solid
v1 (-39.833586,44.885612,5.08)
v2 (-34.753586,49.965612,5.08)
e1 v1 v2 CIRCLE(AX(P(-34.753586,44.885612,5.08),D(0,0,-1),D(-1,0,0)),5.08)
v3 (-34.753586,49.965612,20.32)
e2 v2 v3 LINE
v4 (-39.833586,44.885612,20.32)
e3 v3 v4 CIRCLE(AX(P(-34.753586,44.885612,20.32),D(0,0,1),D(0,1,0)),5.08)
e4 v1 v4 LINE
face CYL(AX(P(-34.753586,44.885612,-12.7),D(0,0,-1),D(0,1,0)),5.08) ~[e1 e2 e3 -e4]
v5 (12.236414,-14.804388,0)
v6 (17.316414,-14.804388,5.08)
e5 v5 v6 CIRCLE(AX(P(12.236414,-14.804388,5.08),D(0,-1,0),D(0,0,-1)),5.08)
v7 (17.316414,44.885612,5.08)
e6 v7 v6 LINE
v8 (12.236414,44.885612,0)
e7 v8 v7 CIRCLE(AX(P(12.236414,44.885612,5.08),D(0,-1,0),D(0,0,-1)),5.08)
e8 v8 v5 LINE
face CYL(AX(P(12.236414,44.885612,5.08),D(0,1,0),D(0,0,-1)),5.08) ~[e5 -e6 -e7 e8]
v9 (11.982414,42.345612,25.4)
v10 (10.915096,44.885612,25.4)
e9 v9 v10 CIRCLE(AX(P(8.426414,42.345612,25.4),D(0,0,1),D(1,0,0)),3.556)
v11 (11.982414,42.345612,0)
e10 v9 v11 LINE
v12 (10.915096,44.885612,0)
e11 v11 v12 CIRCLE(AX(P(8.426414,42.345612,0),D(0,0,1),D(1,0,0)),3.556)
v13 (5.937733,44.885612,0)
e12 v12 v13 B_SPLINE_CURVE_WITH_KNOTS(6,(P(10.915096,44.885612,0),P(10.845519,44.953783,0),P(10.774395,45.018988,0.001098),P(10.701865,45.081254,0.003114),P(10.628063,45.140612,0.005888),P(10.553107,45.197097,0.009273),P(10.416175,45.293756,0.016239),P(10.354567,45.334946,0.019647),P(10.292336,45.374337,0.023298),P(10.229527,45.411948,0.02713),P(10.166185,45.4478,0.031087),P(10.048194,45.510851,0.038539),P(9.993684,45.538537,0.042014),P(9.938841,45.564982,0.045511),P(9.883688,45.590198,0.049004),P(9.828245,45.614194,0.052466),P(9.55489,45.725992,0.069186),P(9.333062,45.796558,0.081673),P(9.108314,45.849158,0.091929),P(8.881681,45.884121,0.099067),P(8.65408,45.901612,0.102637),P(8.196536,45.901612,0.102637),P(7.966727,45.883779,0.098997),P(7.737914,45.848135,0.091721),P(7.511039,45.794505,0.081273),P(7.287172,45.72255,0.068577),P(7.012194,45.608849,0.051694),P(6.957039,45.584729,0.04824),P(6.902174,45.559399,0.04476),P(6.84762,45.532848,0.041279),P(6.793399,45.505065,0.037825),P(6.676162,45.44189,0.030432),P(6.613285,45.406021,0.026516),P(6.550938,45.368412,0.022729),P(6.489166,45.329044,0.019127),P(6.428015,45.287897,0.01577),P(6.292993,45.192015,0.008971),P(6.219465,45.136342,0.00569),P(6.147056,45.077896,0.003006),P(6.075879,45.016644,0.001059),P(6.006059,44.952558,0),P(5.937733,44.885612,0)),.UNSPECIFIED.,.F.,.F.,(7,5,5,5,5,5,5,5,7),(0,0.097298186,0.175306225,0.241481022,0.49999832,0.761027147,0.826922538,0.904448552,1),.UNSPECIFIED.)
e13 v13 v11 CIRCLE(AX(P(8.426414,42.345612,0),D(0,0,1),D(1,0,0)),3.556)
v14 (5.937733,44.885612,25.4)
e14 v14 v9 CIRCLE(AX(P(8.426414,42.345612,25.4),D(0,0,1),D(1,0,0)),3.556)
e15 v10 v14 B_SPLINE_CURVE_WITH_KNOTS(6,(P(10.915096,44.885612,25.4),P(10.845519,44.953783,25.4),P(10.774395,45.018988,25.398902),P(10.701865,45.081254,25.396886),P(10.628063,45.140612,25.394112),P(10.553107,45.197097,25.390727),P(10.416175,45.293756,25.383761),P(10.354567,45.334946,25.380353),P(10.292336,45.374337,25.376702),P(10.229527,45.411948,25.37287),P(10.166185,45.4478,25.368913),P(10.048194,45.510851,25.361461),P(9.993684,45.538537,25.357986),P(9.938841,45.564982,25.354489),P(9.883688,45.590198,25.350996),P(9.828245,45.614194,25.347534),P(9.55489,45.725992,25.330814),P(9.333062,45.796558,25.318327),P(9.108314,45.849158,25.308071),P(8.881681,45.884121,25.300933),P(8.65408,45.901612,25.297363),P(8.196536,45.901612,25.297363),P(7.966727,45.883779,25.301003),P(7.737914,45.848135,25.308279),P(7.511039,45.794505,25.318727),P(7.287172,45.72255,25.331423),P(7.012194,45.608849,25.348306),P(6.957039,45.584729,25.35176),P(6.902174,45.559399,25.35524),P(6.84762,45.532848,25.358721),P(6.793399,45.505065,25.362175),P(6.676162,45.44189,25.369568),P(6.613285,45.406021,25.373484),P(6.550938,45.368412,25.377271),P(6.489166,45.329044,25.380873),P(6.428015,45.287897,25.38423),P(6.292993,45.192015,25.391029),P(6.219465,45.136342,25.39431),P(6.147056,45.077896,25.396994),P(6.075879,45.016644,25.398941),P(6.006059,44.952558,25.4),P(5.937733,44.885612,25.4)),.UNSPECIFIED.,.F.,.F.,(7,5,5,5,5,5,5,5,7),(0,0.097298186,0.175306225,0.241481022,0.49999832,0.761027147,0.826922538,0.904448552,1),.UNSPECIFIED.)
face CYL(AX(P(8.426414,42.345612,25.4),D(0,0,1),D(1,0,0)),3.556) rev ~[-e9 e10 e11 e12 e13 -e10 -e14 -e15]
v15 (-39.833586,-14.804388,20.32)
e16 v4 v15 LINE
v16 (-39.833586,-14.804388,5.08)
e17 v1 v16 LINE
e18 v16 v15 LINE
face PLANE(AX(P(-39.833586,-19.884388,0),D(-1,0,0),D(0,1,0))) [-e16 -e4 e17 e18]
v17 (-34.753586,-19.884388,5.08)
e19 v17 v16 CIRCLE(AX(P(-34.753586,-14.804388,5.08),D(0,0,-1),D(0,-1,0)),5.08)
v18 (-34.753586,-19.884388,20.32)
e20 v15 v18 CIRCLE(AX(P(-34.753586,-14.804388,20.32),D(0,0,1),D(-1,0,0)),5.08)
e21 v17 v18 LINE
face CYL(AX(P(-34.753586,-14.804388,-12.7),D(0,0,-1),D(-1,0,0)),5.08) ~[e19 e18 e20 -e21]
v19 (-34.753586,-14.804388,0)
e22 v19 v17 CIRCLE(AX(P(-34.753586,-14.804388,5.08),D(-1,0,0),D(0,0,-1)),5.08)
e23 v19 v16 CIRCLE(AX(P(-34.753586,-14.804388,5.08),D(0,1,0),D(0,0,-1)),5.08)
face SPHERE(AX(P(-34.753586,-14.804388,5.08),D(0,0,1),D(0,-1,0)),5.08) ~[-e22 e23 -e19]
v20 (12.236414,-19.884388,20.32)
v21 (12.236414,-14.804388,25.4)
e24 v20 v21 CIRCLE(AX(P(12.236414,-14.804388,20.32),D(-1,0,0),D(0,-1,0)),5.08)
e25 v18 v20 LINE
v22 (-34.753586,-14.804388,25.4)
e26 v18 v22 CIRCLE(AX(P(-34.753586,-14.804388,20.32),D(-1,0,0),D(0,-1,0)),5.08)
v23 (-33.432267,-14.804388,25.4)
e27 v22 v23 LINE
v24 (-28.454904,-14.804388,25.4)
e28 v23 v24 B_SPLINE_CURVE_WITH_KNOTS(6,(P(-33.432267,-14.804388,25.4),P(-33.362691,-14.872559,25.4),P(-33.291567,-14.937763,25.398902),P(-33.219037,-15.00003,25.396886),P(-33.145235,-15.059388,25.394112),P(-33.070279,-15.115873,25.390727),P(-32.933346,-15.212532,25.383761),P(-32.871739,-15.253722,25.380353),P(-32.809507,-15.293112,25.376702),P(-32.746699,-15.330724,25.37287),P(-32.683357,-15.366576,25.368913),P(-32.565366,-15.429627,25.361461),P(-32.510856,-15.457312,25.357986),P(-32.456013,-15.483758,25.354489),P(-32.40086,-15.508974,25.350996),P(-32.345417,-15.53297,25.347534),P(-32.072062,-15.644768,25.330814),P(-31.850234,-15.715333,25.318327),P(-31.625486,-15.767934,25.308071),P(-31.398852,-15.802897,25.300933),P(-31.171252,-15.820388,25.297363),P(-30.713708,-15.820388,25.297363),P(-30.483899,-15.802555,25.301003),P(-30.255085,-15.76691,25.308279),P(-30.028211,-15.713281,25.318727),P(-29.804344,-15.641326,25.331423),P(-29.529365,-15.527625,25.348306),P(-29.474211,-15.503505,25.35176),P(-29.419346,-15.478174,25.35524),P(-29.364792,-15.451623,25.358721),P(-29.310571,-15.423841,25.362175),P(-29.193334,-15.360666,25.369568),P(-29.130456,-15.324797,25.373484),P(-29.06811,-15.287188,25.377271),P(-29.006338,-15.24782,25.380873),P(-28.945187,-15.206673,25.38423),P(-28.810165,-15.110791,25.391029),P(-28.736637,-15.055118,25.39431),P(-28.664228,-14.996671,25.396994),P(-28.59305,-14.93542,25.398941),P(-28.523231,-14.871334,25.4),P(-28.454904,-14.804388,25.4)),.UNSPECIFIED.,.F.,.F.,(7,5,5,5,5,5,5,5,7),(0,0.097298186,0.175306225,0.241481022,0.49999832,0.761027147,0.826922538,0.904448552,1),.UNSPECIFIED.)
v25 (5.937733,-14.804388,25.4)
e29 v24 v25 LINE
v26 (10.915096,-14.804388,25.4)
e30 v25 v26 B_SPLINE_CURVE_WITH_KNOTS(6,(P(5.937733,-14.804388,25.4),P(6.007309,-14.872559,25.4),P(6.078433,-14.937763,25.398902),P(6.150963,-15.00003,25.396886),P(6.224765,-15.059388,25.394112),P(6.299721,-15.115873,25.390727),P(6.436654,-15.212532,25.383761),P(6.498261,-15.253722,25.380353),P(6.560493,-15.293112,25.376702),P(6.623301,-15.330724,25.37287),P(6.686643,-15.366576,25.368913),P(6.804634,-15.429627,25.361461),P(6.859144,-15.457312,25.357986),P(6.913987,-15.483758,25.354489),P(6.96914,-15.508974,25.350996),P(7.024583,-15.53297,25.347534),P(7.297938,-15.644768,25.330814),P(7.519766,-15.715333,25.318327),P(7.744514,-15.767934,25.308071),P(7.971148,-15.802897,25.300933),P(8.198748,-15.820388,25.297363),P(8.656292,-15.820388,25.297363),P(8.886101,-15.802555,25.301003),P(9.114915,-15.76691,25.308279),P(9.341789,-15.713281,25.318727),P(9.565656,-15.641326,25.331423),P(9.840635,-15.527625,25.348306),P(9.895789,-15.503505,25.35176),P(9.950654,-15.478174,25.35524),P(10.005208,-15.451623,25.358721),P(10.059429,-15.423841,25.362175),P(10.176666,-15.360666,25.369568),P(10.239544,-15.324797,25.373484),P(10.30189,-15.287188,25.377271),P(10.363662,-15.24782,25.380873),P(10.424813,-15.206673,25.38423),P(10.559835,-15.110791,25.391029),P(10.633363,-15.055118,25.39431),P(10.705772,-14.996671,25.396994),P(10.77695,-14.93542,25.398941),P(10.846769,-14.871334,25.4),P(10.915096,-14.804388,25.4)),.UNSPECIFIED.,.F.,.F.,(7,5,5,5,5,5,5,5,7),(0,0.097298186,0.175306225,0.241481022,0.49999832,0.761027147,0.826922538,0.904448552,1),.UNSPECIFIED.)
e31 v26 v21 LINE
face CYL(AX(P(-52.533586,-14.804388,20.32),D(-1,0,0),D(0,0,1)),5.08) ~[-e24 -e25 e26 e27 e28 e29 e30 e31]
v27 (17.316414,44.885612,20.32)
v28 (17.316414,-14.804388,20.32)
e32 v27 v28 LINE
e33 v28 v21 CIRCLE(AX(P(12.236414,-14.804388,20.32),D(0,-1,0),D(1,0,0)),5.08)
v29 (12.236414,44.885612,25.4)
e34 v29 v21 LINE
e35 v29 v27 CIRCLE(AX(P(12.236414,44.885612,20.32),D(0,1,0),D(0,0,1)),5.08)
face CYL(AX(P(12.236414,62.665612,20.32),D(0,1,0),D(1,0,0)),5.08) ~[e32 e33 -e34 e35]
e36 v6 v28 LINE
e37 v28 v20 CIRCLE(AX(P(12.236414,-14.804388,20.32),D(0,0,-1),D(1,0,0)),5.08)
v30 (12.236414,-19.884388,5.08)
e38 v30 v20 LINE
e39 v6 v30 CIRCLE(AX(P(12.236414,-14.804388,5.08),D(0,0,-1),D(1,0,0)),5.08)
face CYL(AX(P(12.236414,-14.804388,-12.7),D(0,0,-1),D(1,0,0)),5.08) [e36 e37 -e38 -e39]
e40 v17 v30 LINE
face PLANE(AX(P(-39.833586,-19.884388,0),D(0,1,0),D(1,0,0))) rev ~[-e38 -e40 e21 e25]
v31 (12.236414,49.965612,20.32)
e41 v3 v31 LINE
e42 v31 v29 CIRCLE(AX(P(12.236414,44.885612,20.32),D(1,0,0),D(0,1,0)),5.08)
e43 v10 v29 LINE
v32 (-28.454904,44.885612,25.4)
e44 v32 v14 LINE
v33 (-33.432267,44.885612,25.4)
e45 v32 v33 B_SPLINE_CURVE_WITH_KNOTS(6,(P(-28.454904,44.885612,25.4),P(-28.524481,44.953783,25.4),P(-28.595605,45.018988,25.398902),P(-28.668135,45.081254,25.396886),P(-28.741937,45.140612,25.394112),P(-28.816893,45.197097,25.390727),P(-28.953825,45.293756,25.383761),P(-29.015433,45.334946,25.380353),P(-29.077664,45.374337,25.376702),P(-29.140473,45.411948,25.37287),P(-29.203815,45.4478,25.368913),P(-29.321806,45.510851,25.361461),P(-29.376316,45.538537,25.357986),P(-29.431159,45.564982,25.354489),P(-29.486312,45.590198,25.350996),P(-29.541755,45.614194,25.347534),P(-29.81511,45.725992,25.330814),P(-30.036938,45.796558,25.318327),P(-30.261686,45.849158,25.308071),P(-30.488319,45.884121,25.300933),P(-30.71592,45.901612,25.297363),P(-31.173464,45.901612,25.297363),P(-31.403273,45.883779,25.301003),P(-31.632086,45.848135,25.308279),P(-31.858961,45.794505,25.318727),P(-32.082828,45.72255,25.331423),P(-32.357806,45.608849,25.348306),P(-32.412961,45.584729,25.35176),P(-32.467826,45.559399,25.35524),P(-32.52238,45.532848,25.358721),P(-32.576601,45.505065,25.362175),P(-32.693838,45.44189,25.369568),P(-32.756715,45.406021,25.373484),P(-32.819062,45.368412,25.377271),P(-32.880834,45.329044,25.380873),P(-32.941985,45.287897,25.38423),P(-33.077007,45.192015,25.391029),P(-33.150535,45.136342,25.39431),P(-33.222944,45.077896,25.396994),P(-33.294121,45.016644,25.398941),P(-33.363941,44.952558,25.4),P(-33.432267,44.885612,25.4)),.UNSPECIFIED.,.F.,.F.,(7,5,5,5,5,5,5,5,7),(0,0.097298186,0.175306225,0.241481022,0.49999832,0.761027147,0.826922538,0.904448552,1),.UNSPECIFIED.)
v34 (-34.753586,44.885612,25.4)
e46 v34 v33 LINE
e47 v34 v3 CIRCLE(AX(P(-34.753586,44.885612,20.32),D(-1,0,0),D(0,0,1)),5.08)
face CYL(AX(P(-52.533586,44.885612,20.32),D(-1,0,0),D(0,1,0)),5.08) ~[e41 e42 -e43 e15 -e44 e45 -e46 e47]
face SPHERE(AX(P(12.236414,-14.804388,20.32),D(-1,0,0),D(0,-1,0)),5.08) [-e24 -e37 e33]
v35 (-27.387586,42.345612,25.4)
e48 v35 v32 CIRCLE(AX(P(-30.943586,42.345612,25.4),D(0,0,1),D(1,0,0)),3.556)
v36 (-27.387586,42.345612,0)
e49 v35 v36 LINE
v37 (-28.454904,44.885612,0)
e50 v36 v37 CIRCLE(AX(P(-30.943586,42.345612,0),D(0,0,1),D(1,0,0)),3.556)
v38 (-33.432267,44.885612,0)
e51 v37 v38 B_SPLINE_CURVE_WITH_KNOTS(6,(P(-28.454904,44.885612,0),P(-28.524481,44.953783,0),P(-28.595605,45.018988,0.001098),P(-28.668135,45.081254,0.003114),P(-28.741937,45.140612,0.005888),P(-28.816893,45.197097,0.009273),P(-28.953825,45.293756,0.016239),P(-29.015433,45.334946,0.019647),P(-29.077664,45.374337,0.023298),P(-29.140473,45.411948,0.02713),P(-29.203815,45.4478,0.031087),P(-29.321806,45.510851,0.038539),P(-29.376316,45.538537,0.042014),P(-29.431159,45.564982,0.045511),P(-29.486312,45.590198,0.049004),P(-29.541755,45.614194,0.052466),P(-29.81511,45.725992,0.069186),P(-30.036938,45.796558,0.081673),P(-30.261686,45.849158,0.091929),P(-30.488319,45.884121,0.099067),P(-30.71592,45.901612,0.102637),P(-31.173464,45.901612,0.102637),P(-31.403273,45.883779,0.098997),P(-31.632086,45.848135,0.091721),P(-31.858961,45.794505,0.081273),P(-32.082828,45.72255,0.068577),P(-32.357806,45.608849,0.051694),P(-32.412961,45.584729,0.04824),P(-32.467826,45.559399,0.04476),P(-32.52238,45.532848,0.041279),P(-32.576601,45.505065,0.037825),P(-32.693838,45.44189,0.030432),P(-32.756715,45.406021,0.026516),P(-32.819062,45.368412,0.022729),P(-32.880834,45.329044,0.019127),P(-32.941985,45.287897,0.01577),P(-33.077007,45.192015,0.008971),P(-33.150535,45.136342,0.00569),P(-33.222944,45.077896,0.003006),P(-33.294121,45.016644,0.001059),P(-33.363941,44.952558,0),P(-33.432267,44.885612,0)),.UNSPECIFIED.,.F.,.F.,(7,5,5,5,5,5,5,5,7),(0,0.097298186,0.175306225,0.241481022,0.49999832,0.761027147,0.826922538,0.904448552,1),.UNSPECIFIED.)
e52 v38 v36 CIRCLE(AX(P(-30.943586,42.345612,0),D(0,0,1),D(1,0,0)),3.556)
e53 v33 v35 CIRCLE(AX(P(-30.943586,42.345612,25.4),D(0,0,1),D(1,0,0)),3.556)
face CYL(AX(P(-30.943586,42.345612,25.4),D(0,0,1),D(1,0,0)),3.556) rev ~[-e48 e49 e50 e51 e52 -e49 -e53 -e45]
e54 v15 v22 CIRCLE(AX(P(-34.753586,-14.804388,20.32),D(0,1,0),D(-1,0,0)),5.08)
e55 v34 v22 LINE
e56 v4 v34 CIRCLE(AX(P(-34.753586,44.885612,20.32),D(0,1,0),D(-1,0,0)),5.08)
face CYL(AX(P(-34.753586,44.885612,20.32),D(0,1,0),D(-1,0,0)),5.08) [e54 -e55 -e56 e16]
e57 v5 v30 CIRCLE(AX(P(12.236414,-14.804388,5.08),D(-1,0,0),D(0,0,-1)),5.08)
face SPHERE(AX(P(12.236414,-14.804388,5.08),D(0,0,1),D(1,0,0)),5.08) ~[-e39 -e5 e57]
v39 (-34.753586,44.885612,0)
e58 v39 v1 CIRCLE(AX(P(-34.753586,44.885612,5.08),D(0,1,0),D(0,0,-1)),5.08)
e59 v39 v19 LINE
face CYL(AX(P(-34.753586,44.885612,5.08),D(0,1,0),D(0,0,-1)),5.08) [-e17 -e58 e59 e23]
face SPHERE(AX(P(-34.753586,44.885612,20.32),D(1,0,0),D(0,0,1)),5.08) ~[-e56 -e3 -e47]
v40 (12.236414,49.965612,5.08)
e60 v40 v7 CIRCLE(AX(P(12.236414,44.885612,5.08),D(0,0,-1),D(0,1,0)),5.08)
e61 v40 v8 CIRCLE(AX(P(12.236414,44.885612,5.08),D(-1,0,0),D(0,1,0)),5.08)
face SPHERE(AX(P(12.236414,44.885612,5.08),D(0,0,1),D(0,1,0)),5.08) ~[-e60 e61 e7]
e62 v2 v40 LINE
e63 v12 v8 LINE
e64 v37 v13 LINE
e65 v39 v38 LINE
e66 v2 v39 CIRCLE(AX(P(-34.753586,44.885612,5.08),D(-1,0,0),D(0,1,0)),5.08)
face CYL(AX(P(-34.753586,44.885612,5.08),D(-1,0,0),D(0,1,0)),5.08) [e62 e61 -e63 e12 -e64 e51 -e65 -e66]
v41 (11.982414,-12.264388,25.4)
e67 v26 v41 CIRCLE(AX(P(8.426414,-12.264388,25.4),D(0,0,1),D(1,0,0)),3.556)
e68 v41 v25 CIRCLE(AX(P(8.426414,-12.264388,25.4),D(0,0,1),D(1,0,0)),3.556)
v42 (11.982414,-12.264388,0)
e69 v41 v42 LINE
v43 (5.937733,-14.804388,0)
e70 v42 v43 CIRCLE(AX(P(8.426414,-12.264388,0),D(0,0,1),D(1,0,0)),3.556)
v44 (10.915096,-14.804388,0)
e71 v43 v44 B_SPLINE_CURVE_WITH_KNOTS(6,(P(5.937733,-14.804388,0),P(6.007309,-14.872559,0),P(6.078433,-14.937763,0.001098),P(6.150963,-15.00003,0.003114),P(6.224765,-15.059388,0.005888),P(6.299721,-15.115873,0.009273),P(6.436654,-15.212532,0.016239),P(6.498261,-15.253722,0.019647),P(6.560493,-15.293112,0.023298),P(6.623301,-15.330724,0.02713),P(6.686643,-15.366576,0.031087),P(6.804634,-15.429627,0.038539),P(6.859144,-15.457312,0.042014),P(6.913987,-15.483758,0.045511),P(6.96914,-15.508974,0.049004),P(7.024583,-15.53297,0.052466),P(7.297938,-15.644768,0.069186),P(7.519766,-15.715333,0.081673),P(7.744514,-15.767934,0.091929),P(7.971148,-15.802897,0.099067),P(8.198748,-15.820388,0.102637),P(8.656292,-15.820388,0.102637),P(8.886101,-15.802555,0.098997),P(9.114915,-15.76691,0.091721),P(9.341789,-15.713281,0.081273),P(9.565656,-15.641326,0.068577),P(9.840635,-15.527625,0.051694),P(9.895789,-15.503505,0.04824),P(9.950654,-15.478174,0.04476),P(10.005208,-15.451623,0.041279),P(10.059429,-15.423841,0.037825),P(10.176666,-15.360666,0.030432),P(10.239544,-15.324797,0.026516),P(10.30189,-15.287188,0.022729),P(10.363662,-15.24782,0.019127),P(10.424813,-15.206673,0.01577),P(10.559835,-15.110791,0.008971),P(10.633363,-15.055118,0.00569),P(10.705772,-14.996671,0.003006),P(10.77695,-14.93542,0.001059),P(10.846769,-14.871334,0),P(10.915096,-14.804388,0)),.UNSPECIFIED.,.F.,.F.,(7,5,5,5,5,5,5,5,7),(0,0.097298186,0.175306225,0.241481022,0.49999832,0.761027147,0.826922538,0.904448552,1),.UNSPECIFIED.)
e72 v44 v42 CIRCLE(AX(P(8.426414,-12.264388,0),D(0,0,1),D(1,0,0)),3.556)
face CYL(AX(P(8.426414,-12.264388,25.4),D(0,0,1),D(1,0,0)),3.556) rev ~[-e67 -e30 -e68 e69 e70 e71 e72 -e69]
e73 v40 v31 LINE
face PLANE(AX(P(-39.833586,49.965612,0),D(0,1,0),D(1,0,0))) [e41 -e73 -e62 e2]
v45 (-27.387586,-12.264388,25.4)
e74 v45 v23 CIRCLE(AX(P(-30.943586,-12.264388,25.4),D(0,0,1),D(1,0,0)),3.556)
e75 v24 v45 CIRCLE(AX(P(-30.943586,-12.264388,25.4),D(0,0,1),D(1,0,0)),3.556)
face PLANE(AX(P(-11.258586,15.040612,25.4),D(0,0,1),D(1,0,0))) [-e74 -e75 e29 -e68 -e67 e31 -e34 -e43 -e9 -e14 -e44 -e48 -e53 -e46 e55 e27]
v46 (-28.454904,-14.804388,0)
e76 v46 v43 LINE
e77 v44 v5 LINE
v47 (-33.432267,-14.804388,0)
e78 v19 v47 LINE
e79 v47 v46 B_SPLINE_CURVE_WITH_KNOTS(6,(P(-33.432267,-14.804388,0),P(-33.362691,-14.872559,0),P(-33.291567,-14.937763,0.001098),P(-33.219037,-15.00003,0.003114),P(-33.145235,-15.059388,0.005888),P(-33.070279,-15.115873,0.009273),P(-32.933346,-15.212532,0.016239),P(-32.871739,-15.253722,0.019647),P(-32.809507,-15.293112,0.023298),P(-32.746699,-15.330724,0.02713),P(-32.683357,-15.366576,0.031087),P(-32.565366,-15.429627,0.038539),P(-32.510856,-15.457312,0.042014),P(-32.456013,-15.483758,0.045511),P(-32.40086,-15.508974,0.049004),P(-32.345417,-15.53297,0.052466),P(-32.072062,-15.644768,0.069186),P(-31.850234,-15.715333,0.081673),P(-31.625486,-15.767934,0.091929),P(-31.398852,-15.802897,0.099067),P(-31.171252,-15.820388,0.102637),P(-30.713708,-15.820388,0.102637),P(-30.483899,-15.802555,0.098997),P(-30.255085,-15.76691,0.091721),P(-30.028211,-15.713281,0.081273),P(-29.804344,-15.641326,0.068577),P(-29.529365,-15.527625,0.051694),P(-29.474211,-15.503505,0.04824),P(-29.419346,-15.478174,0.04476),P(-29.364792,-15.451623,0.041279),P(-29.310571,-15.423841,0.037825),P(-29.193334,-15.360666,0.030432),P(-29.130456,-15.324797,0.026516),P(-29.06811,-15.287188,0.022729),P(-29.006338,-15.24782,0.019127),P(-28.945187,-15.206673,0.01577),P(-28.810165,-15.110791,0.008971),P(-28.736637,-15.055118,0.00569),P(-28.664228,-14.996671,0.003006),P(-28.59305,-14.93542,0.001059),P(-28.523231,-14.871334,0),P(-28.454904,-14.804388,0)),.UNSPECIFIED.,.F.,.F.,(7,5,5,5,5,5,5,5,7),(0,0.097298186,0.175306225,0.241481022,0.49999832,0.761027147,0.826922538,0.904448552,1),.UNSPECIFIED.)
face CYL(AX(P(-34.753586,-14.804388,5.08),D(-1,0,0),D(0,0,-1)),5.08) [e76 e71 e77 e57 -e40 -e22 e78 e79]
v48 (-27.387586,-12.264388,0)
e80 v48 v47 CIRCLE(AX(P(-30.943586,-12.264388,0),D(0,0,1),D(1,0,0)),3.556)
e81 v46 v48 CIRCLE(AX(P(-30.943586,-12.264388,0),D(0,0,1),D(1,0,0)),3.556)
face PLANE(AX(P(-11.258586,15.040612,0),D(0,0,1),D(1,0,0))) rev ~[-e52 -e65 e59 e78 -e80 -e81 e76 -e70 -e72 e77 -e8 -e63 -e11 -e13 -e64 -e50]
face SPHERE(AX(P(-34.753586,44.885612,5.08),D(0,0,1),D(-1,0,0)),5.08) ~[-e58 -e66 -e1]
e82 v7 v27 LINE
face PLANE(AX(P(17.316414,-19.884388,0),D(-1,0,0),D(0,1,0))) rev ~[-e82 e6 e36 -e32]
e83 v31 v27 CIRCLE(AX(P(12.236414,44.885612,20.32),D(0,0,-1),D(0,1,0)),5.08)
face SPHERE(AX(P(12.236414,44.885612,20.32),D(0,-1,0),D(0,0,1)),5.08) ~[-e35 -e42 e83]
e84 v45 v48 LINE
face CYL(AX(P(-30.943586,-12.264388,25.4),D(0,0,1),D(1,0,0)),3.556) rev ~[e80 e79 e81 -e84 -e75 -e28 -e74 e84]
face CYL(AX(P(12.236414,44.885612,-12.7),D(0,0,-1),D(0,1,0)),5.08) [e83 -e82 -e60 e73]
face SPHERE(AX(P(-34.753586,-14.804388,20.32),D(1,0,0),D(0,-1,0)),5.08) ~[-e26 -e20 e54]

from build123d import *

# Parameters (mm, degrees)
F0_W         = 57.15
F0_H         = 69.85
F1_DEPTH     = 25.4
F2_R         = 3.556
F3_DEPTH     = 25.4
F4_T1_DEPTH  = 82.55
F5_T1_DEPTH  = 77.47
F5_T3_DEPTH  = 33.02
F5_T6_ANGLE  = 89.9999999979
F6_T1_DEPTH  = 64.77
F6_T3_DEPTH  = 33.02
F6_T6_ANGLE  = 89.9999999979
F7_T1_DEPTH  = 59.69
F7_T3_DEPTH  = 33.02
F7_T6_ANGLE  = 89.9999999979
F7_T8_ANGLE  = 89.9999999979
F8_T1_DEPTH  = 59.69
F8_T3_DEPTH  = 46.99
F8_T6_ANGLE  = 89.9999999979
F8_T8_ANGLE  = 90.0000000017
F8_T10_ANGLE = 90.0000000017
F8_T12_ANGLE = 89.9999999979


# Not quite as in the source:
# - a fillet or chamfer that OpenCascade refuses, or shapes differently, is made with other operations: its cross-section is extruded or revolved along the edge and cut away or added


with BuildPart() as f1:
    # F0 (on Top) → F1 (new body)
    with BuildSketch(Plane.XY):
        with Locations((-11.2585859209, 15.0406121326)):
            Rectangle(F0_W, F0_H)
    extrude(amount=F1_DEPTH)

    # F2 (on face) → F3 (cut)
    with BuildSketch(Plane.XY.offset(25.4)):
        with Locations((-30.9435859209, 42.3456121326)):
            Circle(F2_R)
        with Locations((8.4264140791, 42.3456121326)):
            Circle(F2_R)
        with Locations((-30.9435859209, -12.2643878674)):
            Circle(F2_R)
        with Locations((8.4264140791, -12.2643878674)):
            Circle(F2_R)
    extrude(amount=-F3_DEPTH, mode=Mode.SUBTRACT)

    # F4: fillet of radius 5.08 on 1 edges, made by hand

    # F4_s2 → F4_t1 (cut)
    with BuildSketch(Plane.YZ.offset(-52.5335859209)):
        with BuildLine():
            ThreePointArc((-14.8043878674, 25.4), (-18.3964903158, 23.9121024484), (-19.8843878674, 20.32))
            Line((-19.8843878674, 20.32), (-19.8843878674, 25.4))
            Line((-19.8843878674, 25.4), (-14.8043878674, 25.4))
        make_face()
    extrude(amount=F4_T1_DEPTH, mode=Mode.SUBTRACT)

    # F5: fillet of radius 5.08 on 1 edges, made by hand

    # F5_s2 → F5_t1 (cut)
    with BuildSketch(Plane.XZ.offset(-62.6656121326)):
        with BuildLine():
            ThreePointArc((17.3164140791, 20.32), (15.8285165275, 23.9121024484), (12.2364140791, 25.4))
            Line((12.2364140791, 25.4), (17.3164140791, 25.4))
            Line((17.3164140791, 25.4), (17.3164140791, 20.32))
        make_face()
    extrude(amount=F5_T1_DEPTH, mode=Mode.SUBTRACT)

    # F5_s4 → F5_t3 (cut)
    with BuildSketch(Plane.XY.offset(-12.7)):
        with BuildLine():
            ThreePointArc((17.3164140791, -14.8043878674), (15.8285165275, -18.3964903158), (12.2364140791, -19.8843878674))
            Line((12.2364140791, -19.8843878674), (17.3164140791, -19.8843878674))
            Line((17.3164140791, -19.8843878674), (17.3164140791, -14.8043878674))
        make_face()
    extrude(amount=F5_T3_DEPTH, mode=Mode.SUBTRACT)

    # F5_s5 → F5_t6 (revolve, cut)
    with BuildSketch(Plane.XY.offset(20.3199999999)):
        with BuildLine():
            ThreePointArc((17.3164140791, -14.8043878674), (15.8285165275, -18.3964903158), (12.2364140791, -19.8843878674))
            Line((12.2364140791, -19.8843878674), (17.3164140791, -19.8843878674))
            Line((17.3164140791, -19.8843878674), (17.3164140791, -14.8043878674))
        make_face()
    revolve(axis=Axis((17.3164140791, -14.8043878673, 20.3199999999), (-1, 0, 0)), revolution_arc=F5_T6_ANGLE, mode=Mode.SUBTRACT)

    # F6: fillet of radius 5.08 on 1 edges, made by hand

    # F6_s2 → F6_t1 (cut)
    with BuildSketch(Plane.YZ.offset(-52.5335859209)):
        with BuildLine():
            ThreePointArc((49.9656121326, 20.32), (48.477714581, 23.9121024484), (44.8856121326, 25.4))
            Line((44.8856121326, 25.4), (49.9656121326, 25.4))
            Line((49.9656121326, 25.4), (49.9656121326, 20.32))
        make_face()
    extrude(amount=F6_T1_DEPTH, mode=Mode.SUBTRACT)

    # F6_s4 → F6_t3 (cut)
    with BuildSketch(Plane.XY.offset(-12.7)):
        with BuildLine():
            ThreePointArc((12.2364140791, 49.9656121326), (15.8285165275, 48.477714581), (17.3164140791, 44.8856121326))
            Line((17.3164140791, 44.8856121326), (17.3164140791, 49.9656121326))
            Line((17.3164140791, 49.9656121326), (12.2364140791, 49.9656121326))
        make_face()
    extrude(amount=F6_T3_DEPTH, mode=Mode.SUBTRACT)

    # F6_s5 → F6_t6 (revolve, cut)
    with BuildSketch(Plane.YZ.offset(12.236414079)):
        with BuildLine():
            ThreePointArc((49.9656121326, 20.32), (48.477714581, 23.9121024484), (44.8856121326, 25.4))
            Line((44.8856121326, 25.4), (49.9656121326, 25.4))
            Line((49.9656121326, 25.4), (49.9656121326, 20.32))
        make_face()
    revolve(axis=Axis((12.236414079, 49.9656121326, 20.3199999999), (0, 1, 0)), revolution_arc=F6_T6_ANGLE, mode=Mode.SUBTRACT)

    # F7: fillet of radius 5.08 on 1 edges, made by hand

    # F7_s2 → F7_t1 (cut)
    with BuildSketch(Plane.XZ.offset(-44.8856121326)):
        with BuildLine():
            ThreePointArc((-39.8335859209, 20.32), (-38.3456883694, 23.9121024484), (-34.7535859209, 25.4))
            Line((-34.7535859209, 25.4), (-39.8335859209, 25.4))
            Line((-39.8335859209, 25.4), (-39.8335859209, 20.32))
        make_face()
    extrude(amount=F7_T1_DEPTH, mode=Mode.SUBTRACT)

    # F7_s4 → F7_t3 (cut)
    with BuildSketch(Plane.XY.offset(-12.7)):
        with BuildLine():
            ThreePointArc((-39.8335859209, -14.8043878674), (-38.3456883694, -18.3964903158), (-34.7535859209, -19.8843878674))
            Line((-34.7535859209, -19.8843878674), (-39.8335859209, -19.8843878674))
            Line((-39.8335859209, -19.8843878674), (-39.8335859209, -14.8043878674))
        make_face()
        with BuildLine():
            ThreePointArc((-34.7535859209, 49.9656121326), (-38.3456883694, 48.477714581), (-39.8335859209, 44.8856121326))
            Line((-39.8335859209, 44.8856121326), (-39.8335859209, 49.9656121326))
            Line((-39.8335859209, 49.9656121326), (-34.7535859209, 49.9656121326))
        make_face()
    extrude(amount=F7_T3_DEPTH, mode=Mode.SUBTRACT)

    # F7_s5 → F7_t6 (revolve, cut)
    with BuildSketch(Plane.XZ.offset(-44.8856121325)):
        with BuildLine():
            ThreePointArc((-39.8335859209, 20.32), (-38.3456883694, 23.9121024484), (-34.7535859209, 25.4))
            Line((-34.7535859209, 25.4), (-39.8335859209, 25.4))
            Line((-39.8335859209, 25.4), (-39.8335859209, 20.32))
        make_face()
    revolve(axis=Axis((-39.8335859209, 44.8856121325, 20.3199999999), (-1, 0, 0)), revolution_arc=F7_T6_ANGLE, mode=Mode.SUBTRACT)

    # F7_s7 → F7_t8 (revolve, cut)
    with BuildSketch(Plane.XY.offset(20.3199999999)):
        with BuildLine():
            ThreePointArc((-39.8335859209, -14.8043878674), (-38.3456883694, -18.3964903158), (-34.7535859209, -19.8843878674))
            Line((-34.7535859209, -19.8843878674), (-39.8335859209, -19.8843878674))
            Line((-39.8335859209, -19.8843878674), (-39.8335859209, -14.8043878674))
        make_face()
    revolve(axis=Axis((-39.8335859209, -14.8043878673, 20.3199999999), (-1, 0, 0)), revolution_arc=F7_T8_ANGLE, mode=Mode.SUBTRACT)

    # F8: fillet of radius 5.08 on 8 edges, made by hand

    # F8_s2 → F8_t1 (cut)
    with BuildSketch(Plane.XZ.offset(-44.8856121326)):
        with BuildLine():
            ThreePointArc((-34.7535859209, 0), (-38.3456883694, 1.4878975516), (-39.8335859209, 5.08))
            Line((-39.8335859209, 5.08), (-39.8335859209, 0))
            Line((-39.8335859209, 0), (-34.7535859209, 0))
        make_face()
        with BuildLine():
            ThreePointArc((12.2364140791, 0), (15.8285165275, 1.4878975516), (17.3164140791, 5.08))
            Line((17.3164140791, 5.08), (17.3164140791, 0))
            Line((17.3164140791, 0), (12.2364140791, 0))
        make_face()
    extrude(amount=F8_T1_DEPTH, mode=Mode.SUBTRACT)

    # F8_s4 → F8_t3 (cut)
    with BuildSketch(Plane.YZ.offset(-34.7535859209)):
        with BuildLine():
            ThreePointArc((49.9656121326, 5.08), (48.477714581, 1.4878975516), (44.8856121326, 0))
            Line((44.8856121326, 0), (49.9656121326, 0))
            Line((49.9656121326, 0), (49.9656121326, 5.08))
        make_face()
        with BuildLine():
            ThreePointArc((-14.8043878674, 0), (-18.3964903158, 1.4878975516), (-19.8843878674, 5.08))
            Line((-19.8843878674, 5.08), (-19.8843878674, 0))
            Line((-19.8843878674, 0), (-14.8043878674, 0))
        make_face()
    extrude(amount=F8_T3_DEPTH, mode=Mode.SUBTRACT)

    # F8_s5 → F8_t6 (revolve, cut)
    with BuildSketch(Plane.XZ.offset(14.8043878673)):
        with BuildLine():
            ThreePointArc((12.2364140791, 0), (15.8285165275, 1.4878975516), (17.3164140791, 5.08))
            Line((17.3164140791, 5.08), (17.3164140791, 0))
            Line((17.3164140791, 0), (12.2364140791, 0))
        make_face()
    revolve(axis=Axis((12.236414079, -14.8043878673, 0), (0, 0, -1)), revolution_arc=F8_T6_ANGLE, mode=Mode.SUBTRACT)

    # F8_s7 → F8_t8 (revolve, cut)
    with BuildSketch(Plane.YZ.offset(-34.753585921)):
        with BuildLine():
            ThreePointArc((-14.8043878674, 0), (-18.3964903158, 1.4878975516), (-19.8843878674, 5.08))
            Line((-19.8843878674, 5.08), (-19.8843878674, 0))
            Line((-19.8843878674, 0), (-14.8043878674, 0))
        make_face()
    revolve(axis=Axis((-34.753585921, -14.8043878675, 0), (0, 0, -1)), revolution_arc=F8_T8_ANGLE, mode=Mode.SUBTRACT)

    # F8_s9 → F8_t10 (revolve, cut)
    with BuildSketch(Plane.XZ.offset(-44.8856121327)):
        with BuildLine():
            ThreePointArc((-34.7535859209, 0), (-38.3456883693, 1.4878975516), (-39.8335859209, 5.08))
            Line((-39.8335859209, 5.08), (-39.8335859209, 0))
            Line((-39.8335859209, 0), (-34.7535859209, 0))
        make_face()
    revolve(axis=Axis((-34.753585921, 44.8856121327, 0), (0, 0, -1)), revolution_arc=F8_T10_ANGLE, mode=Mode.SUBTRACT)

    # F8_s11 → F8_t12 (revolve, cut)
    with BuildSketch(Plane.YZ.offset(12.236414079)):
        with BuildLine():
            ThreePointArc((44.8856121326, 0), (48.477714581, 1.4878975516), (49.9656121326, 5.08))
            Line((49.9656121326, 5.08), (49.9656121326, 0))
            Line((49.9656121326, 0), (44.8856121326, 0))
        make_face()
    revolve(axis=Axis((12.236414079, 44.8856121325, 0), (0, 0, -1)), revolution_arc=F8_T12_ANGLE, mode=Mode.SUBTRACT)


solid = f1.part
